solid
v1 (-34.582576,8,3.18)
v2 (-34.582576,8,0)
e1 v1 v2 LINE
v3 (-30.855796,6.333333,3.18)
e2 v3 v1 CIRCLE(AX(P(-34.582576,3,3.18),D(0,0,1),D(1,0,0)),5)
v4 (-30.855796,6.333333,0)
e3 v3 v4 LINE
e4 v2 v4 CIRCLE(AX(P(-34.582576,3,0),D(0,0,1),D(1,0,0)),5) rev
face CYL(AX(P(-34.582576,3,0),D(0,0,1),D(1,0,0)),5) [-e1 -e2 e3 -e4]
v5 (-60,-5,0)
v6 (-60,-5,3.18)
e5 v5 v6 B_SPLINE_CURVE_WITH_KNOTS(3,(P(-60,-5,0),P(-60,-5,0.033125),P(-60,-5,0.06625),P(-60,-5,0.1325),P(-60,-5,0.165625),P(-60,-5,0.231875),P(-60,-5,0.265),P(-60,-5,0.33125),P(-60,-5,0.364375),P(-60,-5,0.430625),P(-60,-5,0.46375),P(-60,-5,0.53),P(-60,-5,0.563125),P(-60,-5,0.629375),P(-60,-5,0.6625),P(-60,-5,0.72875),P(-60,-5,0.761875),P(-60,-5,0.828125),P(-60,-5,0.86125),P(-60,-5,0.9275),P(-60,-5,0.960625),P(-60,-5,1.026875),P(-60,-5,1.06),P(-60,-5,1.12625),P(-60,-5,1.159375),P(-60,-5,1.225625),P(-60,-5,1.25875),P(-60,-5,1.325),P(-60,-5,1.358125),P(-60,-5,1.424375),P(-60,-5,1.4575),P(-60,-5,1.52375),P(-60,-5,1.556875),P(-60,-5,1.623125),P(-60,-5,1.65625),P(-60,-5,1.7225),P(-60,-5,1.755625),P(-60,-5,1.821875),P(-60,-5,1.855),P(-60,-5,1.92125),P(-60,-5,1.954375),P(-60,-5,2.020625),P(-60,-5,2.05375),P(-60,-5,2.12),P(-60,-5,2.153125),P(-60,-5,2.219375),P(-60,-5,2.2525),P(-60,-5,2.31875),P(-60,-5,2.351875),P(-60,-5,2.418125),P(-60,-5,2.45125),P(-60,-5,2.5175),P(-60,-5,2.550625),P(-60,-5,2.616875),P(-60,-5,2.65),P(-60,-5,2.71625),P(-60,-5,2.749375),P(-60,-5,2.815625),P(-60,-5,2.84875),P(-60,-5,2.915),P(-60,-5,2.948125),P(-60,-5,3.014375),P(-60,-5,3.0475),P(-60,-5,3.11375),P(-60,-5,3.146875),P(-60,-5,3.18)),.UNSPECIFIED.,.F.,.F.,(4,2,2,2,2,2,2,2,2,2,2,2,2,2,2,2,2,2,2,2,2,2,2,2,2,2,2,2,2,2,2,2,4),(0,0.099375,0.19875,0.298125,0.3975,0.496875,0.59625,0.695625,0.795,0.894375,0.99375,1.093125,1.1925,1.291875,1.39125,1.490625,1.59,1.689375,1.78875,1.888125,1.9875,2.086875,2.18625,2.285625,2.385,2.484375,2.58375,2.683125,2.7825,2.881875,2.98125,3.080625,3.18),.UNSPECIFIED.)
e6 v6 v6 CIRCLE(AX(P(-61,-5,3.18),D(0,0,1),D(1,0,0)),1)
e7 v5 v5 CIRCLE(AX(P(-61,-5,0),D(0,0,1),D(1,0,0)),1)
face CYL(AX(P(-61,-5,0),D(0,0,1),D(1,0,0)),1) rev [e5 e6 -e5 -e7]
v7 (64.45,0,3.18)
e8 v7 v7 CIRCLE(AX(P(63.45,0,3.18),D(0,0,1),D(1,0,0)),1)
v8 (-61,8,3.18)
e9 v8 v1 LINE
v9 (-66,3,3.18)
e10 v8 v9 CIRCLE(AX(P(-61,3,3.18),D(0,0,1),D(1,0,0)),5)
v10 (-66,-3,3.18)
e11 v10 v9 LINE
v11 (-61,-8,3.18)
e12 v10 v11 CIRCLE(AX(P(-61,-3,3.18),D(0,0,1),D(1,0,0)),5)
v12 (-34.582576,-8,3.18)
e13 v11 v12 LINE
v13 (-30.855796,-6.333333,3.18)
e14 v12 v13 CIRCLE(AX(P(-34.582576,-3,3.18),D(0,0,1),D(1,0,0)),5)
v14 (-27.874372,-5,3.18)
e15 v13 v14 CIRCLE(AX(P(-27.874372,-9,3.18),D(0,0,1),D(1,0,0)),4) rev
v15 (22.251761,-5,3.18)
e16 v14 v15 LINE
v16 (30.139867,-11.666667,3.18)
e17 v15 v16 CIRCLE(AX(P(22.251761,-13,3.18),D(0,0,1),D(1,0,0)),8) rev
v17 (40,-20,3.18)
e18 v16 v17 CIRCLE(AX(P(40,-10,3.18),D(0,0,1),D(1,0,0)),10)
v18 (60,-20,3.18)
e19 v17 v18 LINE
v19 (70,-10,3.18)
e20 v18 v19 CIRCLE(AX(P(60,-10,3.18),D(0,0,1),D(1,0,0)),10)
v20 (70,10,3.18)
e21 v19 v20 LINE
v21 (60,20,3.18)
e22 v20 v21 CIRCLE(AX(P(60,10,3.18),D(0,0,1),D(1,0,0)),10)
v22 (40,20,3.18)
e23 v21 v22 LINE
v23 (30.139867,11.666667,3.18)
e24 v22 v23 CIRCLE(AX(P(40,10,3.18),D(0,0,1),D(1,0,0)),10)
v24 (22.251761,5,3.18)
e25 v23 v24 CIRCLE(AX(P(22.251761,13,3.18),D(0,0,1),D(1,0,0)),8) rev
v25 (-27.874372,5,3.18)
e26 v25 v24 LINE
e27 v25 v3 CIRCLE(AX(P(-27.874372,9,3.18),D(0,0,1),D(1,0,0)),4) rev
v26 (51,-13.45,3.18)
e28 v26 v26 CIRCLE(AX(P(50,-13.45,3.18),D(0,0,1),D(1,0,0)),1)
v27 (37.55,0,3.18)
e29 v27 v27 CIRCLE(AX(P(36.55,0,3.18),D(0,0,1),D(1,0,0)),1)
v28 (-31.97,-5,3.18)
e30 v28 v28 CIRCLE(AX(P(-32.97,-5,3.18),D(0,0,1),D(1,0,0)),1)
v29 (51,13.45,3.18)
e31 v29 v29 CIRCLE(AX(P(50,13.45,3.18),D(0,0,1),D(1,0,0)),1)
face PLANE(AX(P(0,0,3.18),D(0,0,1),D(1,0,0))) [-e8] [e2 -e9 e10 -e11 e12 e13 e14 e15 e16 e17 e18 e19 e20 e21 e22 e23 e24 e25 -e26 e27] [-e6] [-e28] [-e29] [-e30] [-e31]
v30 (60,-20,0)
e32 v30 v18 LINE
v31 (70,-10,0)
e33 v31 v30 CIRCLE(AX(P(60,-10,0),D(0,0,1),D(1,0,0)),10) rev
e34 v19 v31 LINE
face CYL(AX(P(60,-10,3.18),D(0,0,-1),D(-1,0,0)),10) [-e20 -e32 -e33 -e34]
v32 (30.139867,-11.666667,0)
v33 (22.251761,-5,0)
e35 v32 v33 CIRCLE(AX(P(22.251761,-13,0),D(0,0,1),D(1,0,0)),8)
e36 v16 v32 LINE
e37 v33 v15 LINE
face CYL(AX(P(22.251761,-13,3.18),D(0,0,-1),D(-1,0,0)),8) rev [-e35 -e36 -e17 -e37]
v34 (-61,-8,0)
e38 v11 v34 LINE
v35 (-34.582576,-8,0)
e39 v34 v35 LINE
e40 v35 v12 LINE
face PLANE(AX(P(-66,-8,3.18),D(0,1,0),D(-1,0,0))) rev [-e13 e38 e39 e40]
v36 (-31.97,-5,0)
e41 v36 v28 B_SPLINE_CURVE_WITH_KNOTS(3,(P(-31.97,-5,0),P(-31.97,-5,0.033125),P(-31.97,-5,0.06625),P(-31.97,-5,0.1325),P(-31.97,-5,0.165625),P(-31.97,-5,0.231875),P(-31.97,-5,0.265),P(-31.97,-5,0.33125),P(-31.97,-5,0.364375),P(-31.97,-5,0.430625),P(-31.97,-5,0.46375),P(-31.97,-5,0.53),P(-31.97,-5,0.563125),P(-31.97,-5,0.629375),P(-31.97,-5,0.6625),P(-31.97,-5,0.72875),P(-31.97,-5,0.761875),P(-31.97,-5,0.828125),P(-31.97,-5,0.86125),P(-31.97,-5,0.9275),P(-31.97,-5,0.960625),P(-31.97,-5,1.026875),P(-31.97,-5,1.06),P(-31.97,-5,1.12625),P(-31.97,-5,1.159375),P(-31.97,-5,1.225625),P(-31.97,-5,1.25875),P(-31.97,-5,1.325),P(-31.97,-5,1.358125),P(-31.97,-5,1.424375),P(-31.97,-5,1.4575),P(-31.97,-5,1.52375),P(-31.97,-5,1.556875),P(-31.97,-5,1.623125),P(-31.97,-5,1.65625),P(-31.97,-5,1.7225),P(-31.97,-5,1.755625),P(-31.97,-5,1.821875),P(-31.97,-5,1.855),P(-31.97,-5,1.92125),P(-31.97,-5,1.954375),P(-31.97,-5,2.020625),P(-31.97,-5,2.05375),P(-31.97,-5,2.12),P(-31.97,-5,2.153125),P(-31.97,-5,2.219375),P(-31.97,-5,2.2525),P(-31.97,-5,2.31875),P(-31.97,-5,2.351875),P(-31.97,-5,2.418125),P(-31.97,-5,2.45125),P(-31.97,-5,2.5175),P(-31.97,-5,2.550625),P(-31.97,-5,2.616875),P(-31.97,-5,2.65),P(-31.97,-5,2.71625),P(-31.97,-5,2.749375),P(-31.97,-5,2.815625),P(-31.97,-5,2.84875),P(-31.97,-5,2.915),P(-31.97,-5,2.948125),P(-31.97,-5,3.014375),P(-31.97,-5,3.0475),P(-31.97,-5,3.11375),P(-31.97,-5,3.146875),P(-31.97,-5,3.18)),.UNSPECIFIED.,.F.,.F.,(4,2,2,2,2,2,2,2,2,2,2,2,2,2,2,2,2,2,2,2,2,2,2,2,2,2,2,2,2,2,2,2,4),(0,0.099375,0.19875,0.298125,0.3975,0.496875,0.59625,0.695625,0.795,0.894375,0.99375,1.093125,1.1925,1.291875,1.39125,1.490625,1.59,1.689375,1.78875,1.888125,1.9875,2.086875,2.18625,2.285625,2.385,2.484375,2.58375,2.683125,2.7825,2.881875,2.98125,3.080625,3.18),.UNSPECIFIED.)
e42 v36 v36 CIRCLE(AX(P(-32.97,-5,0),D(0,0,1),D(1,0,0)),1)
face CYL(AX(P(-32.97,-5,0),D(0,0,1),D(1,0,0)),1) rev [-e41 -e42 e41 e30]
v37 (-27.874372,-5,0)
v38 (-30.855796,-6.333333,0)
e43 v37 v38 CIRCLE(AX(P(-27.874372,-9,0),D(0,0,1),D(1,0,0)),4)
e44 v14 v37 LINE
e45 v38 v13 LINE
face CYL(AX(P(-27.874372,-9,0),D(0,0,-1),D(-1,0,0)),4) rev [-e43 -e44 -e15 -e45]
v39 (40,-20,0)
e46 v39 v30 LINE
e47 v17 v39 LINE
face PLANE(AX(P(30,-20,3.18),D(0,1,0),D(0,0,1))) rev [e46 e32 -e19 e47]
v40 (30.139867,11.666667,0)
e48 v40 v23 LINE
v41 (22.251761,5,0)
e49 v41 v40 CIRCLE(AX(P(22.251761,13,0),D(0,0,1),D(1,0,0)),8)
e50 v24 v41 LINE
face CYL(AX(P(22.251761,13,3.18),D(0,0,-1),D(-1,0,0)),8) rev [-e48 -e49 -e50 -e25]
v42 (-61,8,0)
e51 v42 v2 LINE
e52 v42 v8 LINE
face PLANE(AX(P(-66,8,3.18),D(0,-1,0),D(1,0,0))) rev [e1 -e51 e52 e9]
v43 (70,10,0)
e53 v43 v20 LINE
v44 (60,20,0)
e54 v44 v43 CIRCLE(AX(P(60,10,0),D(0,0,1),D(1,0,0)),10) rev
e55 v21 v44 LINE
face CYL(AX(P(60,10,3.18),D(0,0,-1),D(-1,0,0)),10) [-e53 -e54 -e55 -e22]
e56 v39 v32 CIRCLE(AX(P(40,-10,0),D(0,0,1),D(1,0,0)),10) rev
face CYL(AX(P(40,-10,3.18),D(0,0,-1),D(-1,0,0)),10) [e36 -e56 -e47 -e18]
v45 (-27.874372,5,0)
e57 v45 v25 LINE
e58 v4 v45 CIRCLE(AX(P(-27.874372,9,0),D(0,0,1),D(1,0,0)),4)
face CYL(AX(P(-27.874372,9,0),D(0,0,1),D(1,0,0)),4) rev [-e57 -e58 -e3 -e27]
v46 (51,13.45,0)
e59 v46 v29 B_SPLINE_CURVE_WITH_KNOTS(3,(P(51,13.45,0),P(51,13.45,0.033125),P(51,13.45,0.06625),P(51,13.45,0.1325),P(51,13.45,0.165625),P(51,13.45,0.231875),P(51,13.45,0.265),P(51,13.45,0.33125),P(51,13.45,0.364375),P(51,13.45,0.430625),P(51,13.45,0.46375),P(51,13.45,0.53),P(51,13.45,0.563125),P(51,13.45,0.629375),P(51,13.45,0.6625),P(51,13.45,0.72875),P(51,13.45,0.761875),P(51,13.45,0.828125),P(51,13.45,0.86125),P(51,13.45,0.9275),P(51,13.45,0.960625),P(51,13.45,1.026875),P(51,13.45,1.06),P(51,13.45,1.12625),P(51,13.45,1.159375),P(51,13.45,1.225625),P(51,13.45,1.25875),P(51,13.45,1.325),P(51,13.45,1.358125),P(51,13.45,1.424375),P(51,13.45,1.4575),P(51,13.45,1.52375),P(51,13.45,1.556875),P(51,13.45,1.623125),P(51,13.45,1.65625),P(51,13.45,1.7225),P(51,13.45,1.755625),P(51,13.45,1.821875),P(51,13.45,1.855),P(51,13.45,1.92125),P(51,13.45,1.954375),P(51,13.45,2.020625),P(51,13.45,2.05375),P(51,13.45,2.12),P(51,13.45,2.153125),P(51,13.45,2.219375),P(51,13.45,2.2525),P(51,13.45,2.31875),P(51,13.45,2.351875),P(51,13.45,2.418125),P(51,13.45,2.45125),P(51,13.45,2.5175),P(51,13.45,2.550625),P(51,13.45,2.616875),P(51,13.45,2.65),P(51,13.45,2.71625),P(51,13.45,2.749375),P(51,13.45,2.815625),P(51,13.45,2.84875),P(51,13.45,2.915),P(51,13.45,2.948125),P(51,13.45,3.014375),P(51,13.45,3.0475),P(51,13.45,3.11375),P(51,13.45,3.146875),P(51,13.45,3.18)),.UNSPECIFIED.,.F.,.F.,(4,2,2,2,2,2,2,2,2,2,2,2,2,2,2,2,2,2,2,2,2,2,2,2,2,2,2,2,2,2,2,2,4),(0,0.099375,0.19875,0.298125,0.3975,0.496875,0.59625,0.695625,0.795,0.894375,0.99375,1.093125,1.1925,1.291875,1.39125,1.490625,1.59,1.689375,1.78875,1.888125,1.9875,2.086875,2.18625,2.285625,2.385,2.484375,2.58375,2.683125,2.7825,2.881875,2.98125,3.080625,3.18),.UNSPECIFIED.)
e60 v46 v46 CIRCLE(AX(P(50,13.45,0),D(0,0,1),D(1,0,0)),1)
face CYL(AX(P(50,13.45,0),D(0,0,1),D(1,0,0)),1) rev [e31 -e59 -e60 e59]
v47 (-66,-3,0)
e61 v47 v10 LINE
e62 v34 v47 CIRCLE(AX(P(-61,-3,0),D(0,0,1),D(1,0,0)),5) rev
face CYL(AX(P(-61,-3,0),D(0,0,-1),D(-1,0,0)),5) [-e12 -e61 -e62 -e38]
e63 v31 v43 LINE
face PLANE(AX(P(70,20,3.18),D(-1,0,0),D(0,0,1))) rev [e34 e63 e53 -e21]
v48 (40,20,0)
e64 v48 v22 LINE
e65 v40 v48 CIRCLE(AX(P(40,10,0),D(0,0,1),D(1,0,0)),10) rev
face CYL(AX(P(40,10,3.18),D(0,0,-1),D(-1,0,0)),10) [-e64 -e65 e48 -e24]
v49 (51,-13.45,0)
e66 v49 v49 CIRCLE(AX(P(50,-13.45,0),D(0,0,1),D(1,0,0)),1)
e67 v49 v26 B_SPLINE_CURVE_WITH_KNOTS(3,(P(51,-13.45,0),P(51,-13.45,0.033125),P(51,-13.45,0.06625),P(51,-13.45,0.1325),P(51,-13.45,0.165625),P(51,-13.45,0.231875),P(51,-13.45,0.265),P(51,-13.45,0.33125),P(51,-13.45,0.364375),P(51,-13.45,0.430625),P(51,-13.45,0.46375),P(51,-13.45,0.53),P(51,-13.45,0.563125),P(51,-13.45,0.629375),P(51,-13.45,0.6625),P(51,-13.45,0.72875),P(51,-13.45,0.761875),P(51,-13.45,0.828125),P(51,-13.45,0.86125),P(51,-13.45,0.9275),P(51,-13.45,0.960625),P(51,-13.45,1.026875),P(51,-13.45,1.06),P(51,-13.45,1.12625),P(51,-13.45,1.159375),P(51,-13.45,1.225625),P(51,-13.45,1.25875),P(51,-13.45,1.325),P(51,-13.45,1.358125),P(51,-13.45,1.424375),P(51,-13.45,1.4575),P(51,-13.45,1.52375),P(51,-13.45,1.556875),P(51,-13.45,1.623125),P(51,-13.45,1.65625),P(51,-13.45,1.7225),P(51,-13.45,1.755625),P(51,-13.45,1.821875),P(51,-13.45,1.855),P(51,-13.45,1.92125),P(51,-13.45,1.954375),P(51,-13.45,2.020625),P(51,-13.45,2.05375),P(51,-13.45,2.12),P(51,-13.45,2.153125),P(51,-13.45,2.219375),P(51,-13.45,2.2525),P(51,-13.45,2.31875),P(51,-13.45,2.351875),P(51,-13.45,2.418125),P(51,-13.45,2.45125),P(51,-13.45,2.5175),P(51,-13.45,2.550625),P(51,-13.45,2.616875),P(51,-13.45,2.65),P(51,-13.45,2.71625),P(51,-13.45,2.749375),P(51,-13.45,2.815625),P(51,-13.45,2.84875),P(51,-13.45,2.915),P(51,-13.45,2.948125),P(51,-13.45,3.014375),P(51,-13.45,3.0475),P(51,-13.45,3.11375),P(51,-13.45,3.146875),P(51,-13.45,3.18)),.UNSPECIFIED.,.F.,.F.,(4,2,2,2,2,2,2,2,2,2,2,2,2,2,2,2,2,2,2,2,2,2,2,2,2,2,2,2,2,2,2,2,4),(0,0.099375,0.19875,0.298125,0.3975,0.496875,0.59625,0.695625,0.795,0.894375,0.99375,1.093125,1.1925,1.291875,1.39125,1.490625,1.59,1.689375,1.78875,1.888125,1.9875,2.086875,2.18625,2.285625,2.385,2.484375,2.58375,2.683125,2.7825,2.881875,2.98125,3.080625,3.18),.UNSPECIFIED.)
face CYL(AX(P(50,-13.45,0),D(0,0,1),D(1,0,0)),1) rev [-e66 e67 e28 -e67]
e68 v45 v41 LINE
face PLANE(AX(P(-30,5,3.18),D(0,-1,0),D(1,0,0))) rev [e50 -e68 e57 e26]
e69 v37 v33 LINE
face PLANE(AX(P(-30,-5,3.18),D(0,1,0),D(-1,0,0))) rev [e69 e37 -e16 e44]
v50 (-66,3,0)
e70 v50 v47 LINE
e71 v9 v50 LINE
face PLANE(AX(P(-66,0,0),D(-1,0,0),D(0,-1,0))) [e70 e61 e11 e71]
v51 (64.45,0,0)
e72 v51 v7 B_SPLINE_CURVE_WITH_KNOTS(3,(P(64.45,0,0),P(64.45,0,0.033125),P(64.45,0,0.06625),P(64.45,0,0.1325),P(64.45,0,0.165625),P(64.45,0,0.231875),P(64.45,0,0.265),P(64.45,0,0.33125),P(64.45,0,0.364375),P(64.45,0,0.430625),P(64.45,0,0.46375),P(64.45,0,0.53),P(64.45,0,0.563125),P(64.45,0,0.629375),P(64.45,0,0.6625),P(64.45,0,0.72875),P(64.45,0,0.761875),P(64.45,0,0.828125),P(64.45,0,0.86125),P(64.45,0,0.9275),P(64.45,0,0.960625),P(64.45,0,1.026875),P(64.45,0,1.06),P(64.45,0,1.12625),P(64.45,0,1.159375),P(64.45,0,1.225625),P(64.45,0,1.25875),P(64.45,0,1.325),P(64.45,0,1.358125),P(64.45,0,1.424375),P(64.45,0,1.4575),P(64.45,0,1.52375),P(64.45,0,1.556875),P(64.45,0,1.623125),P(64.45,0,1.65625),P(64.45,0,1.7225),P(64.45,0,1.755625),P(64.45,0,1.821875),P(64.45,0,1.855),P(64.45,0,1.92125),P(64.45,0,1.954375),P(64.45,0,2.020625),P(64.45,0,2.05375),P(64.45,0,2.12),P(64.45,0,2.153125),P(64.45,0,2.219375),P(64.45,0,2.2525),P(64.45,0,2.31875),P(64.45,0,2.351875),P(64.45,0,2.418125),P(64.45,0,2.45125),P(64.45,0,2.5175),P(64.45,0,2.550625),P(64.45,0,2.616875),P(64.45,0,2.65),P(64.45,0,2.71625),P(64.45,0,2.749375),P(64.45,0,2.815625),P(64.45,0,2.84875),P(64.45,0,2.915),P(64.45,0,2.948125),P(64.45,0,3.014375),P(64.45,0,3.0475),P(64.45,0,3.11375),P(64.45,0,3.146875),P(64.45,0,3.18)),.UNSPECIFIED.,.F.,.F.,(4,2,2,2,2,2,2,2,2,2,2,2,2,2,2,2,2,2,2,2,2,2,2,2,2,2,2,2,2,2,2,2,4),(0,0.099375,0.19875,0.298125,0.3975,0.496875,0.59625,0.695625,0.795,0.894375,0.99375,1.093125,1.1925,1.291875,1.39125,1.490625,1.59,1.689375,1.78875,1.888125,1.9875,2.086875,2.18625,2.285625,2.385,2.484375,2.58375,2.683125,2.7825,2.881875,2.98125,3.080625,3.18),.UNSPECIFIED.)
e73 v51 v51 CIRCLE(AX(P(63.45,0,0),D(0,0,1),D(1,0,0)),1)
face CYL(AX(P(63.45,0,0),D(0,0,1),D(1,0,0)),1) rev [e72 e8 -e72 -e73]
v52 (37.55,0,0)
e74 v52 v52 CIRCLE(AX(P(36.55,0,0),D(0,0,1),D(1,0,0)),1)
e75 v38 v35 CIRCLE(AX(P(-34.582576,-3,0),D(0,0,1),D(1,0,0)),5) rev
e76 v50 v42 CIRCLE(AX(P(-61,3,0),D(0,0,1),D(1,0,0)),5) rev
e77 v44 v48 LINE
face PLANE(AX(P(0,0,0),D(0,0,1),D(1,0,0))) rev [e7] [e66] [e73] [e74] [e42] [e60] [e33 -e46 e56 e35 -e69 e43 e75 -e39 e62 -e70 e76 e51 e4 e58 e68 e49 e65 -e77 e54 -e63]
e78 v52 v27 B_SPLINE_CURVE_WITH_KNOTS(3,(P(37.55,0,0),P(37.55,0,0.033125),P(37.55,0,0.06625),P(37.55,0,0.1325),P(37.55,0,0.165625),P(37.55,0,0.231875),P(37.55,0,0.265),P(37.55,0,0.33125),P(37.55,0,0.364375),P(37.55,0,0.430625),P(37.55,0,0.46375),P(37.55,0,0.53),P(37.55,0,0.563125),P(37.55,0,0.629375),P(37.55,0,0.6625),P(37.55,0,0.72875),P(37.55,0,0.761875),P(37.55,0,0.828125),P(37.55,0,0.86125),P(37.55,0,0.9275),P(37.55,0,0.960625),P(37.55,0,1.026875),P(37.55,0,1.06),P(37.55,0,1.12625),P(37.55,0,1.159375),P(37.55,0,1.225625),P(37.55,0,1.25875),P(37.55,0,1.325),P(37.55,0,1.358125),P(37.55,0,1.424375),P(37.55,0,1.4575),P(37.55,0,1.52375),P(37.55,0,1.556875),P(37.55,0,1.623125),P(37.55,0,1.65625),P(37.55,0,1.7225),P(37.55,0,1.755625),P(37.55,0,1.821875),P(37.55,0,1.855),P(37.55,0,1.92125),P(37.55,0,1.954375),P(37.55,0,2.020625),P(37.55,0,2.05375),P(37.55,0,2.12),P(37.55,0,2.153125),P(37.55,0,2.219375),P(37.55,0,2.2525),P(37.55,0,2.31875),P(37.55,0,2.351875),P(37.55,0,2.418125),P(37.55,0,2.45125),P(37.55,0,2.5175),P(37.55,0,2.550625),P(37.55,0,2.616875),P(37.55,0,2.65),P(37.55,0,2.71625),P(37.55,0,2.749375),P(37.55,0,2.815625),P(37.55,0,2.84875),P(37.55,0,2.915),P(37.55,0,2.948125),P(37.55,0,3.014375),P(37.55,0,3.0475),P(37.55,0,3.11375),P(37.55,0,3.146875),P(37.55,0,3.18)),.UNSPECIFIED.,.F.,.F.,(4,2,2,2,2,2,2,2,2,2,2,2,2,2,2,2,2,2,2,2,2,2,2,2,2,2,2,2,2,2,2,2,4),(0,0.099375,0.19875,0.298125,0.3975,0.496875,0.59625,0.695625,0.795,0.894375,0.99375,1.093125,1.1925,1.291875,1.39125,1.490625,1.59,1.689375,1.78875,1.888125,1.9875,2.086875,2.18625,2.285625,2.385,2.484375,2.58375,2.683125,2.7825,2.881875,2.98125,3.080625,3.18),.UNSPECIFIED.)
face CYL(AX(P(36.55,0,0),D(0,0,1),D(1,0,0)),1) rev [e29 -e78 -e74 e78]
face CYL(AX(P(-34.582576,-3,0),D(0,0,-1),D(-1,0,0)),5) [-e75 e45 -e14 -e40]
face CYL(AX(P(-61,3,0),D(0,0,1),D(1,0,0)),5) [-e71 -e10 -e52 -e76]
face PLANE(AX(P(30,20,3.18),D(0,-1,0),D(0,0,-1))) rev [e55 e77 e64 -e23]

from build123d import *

# Parameters (mm, degrees)
SKETCH1_W           = 40
SKETCH1_H           = 40
BOSS_EXTRUDE1_DEPTH = 3.18
SKETCH2_W           = 3.18
SKETCH2_H           = 10
BOSS_EXTRUDE2_DEPTH = 60
SKETCH3_W           = 3.18
SKETCH3_H           = 16
BOSS_EXTRUDE3_DEPTH = 36
FILLET1_R           = 10
FILLET2_R           = 8
FILLET3_R           = 5
FILLET4_R           = 4
SKETCH7_R           = 1
CUT_EXTRUDE2_DEPTH  = 3.18
SKETCH8_R           = 1
CUT_EXTRUDE3_DEPTH  = 3.18


with BuildPart() as part:
    # Sketch1 → Boss-Extrude1 (new body)
    with BuildSketch(Plane.XY):
        with Locations((50, 0)):
            Rectangle(SKETCH1_W, SKETCH1_H)
    extrude(amount=BOSS_EXTRUDE1_DEPTH)

    # Sketch2 → Boss-Extrude2 (add)
    with BuildSketch(Plane.ZY.offset(-30)):
        with Locations((1.59, 0)):
            Rectangle(SKETCH2_W, SKETCH2_H)
    extrude(amount=BOSS_EXTRUDE2_DEPTH)

    # Sketch3 → Boss-Extrude3 (add)
    with BuildSketch(Plane.ZY.offset(30)):
        with Locations((1.59, 0)):
            Rectangle(SKETCH3_W, SKETCH3_H)
    extrude(amount=BOSS_EXTRUDE3_DEPTH)

    # Fillet1
    fillet1_edges = [part.edges().sort_by_distance(p)[0] for p in [
        (70, -20, 1.59),
        (30, -20, 1.59),
        (30, 20, 1.59),
        (70, 20, 1.59),
    ]]
    fillet(fillet1_edges, radius=FILLET1_R)

    # Fillet2
    fillet2_edges = [part.edges().sort_by_distance(p)[0] for p in [
        (30, 5, 1.59),
        (30, -5, 1.59),
    ]]
    fillet(fillet2_edges, radius=FILLET2_R)

    # Fillet3
    # the kernel refuses this fillet: 5 mm, written as the material it takes off along each edge
    with BuildSketch(Plane(origin=(-30, 8, -11.456439237), x_dir=(-1, 0, 0), z_dir=(0, 0, 1))) as fillet3_piece_1:
        with BuildLine():
            CenterArc((4.582575695, 5), FILLET3_R, 203.578178478, 66.421821522)
            Line((0, 3), (-0.091651514, 2.96))
            ThreePointArc((-0.091651514, 2.96), (-0.1, 1.5), (-0.1, 0))
            Line((-0.1, 0), (0, -0.1))
            Line((0, -0.1), (4.582575695, -0.1))
            Line((4.582575695, -0.1), (4.582575695, 0))
        make_face()
    extrude(amount=26.092878475, mode=Mode.SUBTRACT)
    with BuildSketch(Plane(origin=(-66, 8, -12.5), x_dir=(0, -1, 0), z_dir=(0, 0, 1))) as fillet3_piece_2:
        with BuildLine():
            CenterArc((FILLET3_R, FILLET3_R), FILLET3_R, 180, 90)
            Line((0, FILLET3_R), (-FILLET3_R * 0.02, FILLET3_R))
            Line((-FILLET3_R * 0.02, FILLET3_R), (-FILLET3_R * 0.02, -FILLET3_R * 0.02))
            Line((-FILLET3_R * 0.02, -FILLET3_R * 0.02), (FILLET3_R, -FILLET3_R * 0.02))
            Line((FILLET3_R, -FILLET3_R * 0.02), (FILLET3_R, 0))
        make_face()
    extrude(amount=28.18, mode=Mode.SUBTRACT)
    with BuildSketch(Plane(origin=(-66, -8, 15.68), x_dir=(1, 0, 0), z_dir=(0, 0, -1))) as fillet3_piece_3:
        with BuildLine():
            CenterArc((FILLET3_R, -FILLET3_R), FILLET3_R, 90, 90)
            Line((0, -FILLET3_R), (-FILLET3_R * 0.02, -FILLET3_R))
            Line((-FILLET3_R * 0.02, -FILLET3_R), (-FILLET3_R * 0.02, FILLET3_R * 0.02))
            Line((-FILLET3_R * 0.02, FILLET3_R * 0.02), (FILLET3_R, FILLET3_R * 0.02))
            Line((FILLET3_R, FILLET3_R * 0.02), (FILLET3_R, 0))
        make_face()
    extrude(amount=28.18, mode=Mode.SUBTRACT)
    with BuildSketch(Plane(origin=(-30, -8, 14.636439237), x_dir=(0, 1, 0), z_dir=(0, 0, -1))) as fillet3_piece_4:
        with BuildLine():
            CenterArc((5, -4.582575695), FILLET3_R, 113.578178478, 66.421821522)
            Line((0, -4.582575695), (-0.1, -4.582575695))
            Line((-0.1, -4.582575695), (-0.1, 0))
            Line((-0.1, 0), (0, 0.1))
            ThreePointArc((0, 0.1), (1.5, 0.1), (2.96, 0.091651514))
            Line((2.96, 0.091651514), (3, 0))
        make_face()
    extrude(amount=26.092878475, mode=Mode.SUBTRACT)

    # Fillet4
    fillet4_edges = [part.edges().sort_by_distance(p)[0] for p in [
        (-30, -5, 1.59),
        (-30, 5, 1.59),
    ]]
    fillet(fillet4_edges, radius=FILLET4_R)

    # Sketch7 → Cut-Extrude2 (cut)
    with BuildSketch(Plane.XY.offset(3.18)):
        with Locations((63.45, 0)):
            Circle(SKETCH7_R)
        with Locations((36.55, 0)):
            Circle(SKETCH7_R)
        with Locations((50, 13.45)):
            Circle(SKETCH7_R)
        with Locations((50, -13.45)):
            Circle(SKETCH7_R)
    extrude(amount=-CUT_EXTRUDE2_DEPTH, mode=Mode.SUBTRACT)

    # Sketch8 → Cut-Extrude3 (cut)
    with BuildSketch(Plane.XY.offset(3.18)):
        with Locations((-32.97, -5)):
            Circle(SKETCH8_R)
        with Locations((-61, -5)):
            Circle(SKETCH8_R)
    extrude(amount=-CUT_EXTRUDE3_DEPTH, mode=Mode.SUBTRACT)


solid = part.part
